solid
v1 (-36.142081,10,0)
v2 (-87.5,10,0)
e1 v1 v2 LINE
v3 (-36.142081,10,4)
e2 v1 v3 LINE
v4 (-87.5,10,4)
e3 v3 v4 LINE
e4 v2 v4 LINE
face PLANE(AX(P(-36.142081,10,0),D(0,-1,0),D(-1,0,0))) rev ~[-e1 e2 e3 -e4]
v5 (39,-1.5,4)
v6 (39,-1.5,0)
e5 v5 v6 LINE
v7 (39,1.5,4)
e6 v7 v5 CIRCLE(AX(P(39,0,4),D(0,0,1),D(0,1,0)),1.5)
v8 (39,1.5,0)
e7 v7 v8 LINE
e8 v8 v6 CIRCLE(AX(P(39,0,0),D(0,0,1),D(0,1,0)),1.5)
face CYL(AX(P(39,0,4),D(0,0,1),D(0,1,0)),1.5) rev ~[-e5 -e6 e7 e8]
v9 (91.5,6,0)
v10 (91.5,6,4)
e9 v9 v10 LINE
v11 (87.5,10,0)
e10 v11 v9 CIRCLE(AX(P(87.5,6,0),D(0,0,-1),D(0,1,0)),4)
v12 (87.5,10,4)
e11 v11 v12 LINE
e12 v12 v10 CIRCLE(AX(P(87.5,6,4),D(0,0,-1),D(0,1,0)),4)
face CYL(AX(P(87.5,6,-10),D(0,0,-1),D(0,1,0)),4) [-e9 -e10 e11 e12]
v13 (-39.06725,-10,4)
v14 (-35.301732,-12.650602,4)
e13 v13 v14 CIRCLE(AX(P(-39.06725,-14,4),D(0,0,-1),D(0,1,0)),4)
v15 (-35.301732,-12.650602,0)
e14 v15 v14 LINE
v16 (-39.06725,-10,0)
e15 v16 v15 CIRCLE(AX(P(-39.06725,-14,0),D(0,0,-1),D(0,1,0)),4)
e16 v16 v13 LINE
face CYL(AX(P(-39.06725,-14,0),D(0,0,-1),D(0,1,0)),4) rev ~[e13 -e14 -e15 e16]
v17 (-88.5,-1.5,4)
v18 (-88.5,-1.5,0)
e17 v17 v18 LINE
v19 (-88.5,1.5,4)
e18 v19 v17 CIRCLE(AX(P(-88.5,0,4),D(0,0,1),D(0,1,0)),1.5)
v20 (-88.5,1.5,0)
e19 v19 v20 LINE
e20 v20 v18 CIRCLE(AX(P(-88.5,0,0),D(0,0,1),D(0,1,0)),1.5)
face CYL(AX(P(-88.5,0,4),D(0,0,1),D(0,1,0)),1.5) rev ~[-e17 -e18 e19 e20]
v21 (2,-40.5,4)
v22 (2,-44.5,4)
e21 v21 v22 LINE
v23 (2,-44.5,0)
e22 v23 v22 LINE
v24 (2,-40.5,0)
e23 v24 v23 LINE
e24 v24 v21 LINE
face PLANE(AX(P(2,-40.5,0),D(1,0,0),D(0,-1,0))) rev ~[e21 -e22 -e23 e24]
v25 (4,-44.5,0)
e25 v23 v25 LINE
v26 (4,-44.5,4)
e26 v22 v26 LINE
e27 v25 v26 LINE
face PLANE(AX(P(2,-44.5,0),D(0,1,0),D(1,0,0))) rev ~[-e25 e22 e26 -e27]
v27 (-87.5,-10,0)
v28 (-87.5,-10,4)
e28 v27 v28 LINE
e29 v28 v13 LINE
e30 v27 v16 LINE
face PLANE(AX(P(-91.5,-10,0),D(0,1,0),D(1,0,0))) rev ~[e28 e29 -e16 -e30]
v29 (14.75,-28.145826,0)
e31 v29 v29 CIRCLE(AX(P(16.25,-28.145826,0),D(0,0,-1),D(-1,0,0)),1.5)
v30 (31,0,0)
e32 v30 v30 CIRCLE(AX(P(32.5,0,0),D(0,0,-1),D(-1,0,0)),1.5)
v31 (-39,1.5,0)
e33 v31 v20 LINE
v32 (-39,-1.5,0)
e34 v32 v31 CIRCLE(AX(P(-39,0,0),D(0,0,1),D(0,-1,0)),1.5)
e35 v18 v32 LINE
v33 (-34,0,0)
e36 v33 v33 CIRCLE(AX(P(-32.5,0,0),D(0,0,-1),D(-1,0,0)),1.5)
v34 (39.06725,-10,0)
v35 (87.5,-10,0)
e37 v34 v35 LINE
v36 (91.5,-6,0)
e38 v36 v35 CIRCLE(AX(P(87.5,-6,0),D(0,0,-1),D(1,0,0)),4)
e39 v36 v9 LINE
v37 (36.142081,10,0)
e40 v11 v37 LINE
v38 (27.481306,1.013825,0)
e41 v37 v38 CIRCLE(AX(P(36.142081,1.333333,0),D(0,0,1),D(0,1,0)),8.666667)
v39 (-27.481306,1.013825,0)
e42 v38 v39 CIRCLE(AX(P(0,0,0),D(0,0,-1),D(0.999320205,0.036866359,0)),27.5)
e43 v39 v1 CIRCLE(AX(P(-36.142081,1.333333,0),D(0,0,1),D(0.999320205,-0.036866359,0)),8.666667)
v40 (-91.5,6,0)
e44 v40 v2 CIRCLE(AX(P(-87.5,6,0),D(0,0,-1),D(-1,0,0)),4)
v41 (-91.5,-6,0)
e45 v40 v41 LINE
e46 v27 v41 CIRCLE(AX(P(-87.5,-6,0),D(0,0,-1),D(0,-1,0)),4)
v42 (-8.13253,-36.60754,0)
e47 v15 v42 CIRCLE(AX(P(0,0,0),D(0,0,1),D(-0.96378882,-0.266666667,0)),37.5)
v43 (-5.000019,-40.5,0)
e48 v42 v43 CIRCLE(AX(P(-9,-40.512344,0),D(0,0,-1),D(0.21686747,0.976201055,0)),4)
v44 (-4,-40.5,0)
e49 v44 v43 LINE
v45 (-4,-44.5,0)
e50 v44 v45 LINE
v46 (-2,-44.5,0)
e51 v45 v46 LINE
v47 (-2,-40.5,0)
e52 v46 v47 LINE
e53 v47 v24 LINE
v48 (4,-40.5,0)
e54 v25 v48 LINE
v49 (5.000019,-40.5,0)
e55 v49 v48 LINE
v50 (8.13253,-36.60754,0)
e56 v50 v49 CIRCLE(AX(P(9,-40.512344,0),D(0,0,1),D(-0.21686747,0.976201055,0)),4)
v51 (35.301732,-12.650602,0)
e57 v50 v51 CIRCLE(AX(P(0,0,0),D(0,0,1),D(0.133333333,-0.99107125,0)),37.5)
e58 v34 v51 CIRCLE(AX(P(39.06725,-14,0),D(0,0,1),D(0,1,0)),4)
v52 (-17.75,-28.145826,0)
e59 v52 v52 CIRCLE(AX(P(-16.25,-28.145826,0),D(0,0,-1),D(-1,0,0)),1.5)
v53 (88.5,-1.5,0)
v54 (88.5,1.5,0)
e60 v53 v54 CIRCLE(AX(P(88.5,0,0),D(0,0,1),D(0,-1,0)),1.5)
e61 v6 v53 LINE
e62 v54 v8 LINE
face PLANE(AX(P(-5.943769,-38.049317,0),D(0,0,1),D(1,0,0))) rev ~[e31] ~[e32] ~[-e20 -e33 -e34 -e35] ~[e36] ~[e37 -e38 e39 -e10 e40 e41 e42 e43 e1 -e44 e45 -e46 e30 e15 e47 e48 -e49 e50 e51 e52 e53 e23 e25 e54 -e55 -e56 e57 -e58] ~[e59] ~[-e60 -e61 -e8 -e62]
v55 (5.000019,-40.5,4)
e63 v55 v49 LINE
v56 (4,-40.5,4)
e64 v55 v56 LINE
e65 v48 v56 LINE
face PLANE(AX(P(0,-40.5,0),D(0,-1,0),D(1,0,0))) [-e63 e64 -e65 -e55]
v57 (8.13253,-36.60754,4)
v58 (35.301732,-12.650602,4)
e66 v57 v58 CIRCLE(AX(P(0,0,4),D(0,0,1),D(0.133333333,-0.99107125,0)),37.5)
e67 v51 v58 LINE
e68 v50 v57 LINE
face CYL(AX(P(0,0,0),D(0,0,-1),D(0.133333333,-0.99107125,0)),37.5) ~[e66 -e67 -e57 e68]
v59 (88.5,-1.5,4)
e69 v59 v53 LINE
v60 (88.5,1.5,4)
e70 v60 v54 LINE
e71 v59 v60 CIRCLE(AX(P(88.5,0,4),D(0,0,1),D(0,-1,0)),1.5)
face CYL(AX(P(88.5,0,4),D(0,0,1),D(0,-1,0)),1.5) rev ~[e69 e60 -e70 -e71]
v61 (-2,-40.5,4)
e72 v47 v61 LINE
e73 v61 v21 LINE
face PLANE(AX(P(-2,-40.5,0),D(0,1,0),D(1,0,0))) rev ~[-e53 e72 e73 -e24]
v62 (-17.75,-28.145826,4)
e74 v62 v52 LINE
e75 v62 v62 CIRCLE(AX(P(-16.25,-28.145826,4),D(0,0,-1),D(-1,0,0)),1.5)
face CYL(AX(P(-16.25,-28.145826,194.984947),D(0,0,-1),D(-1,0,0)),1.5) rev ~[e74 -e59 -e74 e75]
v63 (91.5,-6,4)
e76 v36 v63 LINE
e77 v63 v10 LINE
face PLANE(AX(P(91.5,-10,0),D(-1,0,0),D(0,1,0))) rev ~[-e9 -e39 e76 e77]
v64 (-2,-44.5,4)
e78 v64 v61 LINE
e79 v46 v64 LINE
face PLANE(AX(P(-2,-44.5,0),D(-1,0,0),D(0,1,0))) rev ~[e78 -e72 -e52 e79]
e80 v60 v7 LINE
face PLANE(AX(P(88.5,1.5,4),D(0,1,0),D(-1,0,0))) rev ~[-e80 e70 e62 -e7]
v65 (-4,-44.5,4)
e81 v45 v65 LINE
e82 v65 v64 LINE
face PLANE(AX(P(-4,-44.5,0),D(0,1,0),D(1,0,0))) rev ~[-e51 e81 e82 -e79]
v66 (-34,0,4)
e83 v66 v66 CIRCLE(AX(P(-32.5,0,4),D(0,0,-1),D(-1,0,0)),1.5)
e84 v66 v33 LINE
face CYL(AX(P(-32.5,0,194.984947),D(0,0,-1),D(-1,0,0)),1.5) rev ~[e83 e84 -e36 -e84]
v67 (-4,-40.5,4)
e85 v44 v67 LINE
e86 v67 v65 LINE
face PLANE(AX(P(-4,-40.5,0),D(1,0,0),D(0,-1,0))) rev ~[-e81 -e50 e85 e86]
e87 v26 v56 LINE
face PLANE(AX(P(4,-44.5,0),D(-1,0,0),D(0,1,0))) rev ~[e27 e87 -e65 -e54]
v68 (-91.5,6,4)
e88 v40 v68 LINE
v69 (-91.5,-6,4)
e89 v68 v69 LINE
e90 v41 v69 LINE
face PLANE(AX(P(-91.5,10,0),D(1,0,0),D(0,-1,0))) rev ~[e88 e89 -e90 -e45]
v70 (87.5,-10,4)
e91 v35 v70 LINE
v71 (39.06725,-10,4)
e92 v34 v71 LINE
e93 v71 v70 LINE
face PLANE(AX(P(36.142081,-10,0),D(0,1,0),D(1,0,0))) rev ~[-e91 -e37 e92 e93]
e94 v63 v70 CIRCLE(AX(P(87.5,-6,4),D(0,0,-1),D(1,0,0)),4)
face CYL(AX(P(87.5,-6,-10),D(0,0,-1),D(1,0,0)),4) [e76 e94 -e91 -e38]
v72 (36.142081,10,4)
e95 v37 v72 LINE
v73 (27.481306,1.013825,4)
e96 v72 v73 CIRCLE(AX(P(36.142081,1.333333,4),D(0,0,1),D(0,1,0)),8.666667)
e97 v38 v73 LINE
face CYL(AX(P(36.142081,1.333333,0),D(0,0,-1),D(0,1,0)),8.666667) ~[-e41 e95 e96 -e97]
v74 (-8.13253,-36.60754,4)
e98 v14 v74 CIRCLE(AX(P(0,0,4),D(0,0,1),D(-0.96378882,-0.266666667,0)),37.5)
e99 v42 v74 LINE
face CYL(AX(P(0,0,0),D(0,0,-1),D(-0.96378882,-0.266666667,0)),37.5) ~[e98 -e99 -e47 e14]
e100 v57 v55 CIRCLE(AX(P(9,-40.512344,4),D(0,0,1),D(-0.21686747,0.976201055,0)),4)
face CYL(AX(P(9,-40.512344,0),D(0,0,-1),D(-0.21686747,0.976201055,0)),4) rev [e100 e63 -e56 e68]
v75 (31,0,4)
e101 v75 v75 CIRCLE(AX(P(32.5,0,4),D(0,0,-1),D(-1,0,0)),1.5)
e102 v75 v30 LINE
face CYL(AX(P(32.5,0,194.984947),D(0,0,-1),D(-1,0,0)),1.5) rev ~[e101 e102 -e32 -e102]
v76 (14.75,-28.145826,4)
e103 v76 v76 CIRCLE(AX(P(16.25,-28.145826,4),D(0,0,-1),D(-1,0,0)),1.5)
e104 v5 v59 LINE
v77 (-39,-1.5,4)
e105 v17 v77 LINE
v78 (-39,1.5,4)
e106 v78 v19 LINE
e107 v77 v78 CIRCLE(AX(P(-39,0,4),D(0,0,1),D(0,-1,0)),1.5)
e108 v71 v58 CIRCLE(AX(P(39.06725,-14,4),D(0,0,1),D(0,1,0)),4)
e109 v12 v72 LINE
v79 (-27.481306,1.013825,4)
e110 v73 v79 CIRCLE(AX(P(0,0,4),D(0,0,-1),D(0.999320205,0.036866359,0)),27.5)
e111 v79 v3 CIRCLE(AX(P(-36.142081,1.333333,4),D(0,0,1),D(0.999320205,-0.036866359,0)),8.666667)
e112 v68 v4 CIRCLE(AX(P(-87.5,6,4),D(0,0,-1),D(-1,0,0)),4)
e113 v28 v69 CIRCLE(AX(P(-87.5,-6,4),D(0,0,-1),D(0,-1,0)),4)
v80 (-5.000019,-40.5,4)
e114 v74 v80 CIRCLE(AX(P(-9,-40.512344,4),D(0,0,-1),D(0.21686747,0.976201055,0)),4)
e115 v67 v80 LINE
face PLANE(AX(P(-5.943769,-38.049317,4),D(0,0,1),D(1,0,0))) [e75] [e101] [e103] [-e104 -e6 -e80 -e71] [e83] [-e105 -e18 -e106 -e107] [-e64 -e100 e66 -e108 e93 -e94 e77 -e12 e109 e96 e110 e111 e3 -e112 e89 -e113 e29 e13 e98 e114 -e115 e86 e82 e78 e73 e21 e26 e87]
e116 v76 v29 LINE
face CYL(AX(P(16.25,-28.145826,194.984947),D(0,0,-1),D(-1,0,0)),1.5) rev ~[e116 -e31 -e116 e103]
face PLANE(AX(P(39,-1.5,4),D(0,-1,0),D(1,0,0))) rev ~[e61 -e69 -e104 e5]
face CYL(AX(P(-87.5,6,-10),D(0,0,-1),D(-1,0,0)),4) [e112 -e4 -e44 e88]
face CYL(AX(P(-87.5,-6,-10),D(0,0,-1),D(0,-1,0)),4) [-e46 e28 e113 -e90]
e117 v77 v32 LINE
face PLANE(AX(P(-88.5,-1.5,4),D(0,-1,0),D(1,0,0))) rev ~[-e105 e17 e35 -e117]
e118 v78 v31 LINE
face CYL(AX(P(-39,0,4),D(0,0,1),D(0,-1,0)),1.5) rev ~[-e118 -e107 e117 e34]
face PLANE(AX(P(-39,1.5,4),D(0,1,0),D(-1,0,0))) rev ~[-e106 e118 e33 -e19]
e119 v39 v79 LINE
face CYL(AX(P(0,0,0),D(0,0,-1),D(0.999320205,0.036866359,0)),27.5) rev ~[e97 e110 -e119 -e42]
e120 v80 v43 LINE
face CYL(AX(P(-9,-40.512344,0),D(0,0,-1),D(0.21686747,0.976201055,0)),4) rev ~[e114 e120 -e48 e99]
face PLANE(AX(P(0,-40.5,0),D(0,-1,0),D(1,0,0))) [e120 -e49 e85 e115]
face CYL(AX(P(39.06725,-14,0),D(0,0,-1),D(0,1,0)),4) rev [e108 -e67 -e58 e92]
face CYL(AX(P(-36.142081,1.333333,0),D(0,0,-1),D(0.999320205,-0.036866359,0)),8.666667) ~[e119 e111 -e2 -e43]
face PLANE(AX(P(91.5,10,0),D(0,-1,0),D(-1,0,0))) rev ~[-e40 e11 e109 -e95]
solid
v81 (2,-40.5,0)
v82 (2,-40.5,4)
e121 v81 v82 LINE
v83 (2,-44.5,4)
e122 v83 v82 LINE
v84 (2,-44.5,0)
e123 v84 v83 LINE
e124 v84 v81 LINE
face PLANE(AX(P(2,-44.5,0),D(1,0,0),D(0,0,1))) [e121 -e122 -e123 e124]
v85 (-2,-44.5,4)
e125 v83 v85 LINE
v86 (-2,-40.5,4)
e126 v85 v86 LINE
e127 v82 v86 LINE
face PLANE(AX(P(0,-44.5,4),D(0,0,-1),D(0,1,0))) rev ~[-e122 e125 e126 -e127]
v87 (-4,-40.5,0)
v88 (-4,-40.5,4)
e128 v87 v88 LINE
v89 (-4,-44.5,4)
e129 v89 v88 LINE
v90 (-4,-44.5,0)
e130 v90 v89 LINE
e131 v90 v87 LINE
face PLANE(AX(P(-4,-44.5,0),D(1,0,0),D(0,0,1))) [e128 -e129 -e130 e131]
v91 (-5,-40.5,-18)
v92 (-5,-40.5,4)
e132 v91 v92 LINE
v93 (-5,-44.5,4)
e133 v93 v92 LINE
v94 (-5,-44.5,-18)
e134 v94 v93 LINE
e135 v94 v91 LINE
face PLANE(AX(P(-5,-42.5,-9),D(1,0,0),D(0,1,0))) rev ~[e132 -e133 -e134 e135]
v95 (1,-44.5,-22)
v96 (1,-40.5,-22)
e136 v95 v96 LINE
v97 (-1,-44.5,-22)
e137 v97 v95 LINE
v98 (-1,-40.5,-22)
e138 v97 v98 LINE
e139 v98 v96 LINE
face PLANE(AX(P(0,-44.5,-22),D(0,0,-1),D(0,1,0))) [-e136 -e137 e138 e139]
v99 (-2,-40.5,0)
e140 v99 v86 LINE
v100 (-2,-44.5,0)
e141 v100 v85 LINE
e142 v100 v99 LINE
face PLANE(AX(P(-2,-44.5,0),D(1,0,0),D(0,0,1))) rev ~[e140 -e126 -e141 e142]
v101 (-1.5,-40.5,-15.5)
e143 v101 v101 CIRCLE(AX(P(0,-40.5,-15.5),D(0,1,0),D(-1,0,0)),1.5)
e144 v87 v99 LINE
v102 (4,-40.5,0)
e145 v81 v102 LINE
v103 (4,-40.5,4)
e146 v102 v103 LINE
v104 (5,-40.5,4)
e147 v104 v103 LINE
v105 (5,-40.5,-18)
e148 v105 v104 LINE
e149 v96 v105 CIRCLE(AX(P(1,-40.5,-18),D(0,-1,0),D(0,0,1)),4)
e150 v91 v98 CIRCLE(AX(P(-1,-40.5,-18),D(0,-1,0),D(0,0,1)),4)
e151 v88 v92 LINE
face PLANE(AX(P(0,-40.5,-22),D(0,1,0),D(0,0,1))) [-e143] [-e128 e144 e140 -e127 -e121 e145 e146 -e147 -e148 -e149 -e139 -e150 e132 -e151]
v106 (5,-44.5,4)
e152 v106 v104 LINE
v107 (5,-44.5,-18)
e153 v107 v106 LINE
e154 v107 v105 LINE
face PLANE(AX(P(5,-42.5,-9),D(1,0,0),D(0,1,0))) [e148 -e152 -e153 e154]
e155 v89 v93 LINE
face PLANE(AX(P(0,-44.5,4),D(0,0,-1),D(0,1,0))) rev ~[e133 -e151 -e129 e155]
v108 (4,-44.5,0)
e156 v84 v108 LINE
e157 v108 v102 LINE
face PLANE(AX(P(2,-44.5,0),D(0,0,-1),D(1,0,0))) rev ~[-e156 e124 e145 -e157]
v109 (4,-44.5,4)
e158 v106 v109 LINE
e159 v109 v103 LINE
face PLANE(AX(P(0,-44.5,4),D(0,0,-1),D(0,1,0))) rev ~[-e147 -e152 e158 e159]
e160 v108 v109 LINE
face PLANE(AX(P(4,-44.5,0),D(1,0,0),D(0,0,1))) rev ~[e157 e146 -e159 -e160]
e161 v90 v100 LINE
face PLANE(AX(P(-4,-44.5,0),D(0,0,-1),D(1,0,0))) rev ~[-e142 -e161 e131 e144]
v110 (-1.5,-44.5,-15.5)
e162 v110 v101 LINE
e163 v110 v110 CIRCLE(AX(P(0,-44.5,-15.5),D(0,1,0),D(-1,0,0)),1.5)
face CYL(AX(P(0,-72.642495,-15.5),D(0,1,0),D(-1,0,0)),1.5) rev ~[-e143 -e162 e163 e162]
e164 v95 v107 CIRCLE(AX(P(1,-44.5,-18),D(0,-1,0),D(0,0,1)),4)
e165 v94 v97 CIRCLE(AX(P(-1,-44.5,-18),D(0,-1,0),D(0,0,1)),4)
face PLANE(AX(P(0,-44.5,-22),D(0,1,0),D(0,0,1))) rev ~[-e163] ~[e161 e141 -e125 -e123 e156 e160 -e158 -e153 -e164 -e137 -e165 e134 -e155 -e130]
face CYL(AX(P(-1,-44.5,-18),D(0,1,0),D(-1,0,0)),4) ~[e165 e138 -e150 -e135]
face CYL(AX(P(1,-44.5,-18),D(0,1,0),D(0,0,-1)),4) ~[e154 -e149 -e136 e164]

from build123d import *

# Parameters (mm, degrees)
F1_DEPTH      = 4
F3_D          = 3
F5_DEPTH      = 4
F6_W          = 4
F6_H          = 26
F7_DEPTH      = 5
F7_DEPTH_BACK = 5
F8_T1_DEPTH   = 4
F8_T6_DEPTH   = 4
F8_T11_DEPTH  = 4
F8_T13_DEPTH  = 24
F8_2_F1_R     = 4
F8_2_F2_R     = 4
F10_D         = 3
F11_W         = 2
F11_H         = 4
F12_DEPTH     = 4


# Not quite as in the source:
# - a fillet or chamfer that OpenCascade refuses, or shapes differently, is made with other operations: its cross-section is extruded or revolved along the edge and cut away or added
# - a feature names something its author has since deleted; it is built from what else it names


with BuildPart() as f1:
    # F0 (on Top) → F1 (new body)
    with BuildSketch(Plane.XY):
        with BuildLine():
            ThreePointArc((27.4813056295, 1.0138248848), (0, -27.5), (-27.4813056295, 1.0138248848))
            ThreePointArc((-27.4813056295, 1.0138248848), (-29.9018810474, 7.3475680266), (-36.142080737, 10))
            Line((-36.142080737, 10), (-91.5, 10))
            Line((-91.5, 10), (-91.5, -10))
            Line((-91.5, -10), (-36.142080737, -10))
            ThreePointArc((-36.142080737, -10), (-24.6506458841, -28.2594348404), (-5, -37.1651718683))
            Line((-5, -37.1651718683), (-5, -40.5))
            Line((-5, -40.5), (-4, -40.5))
            Line((-4, -40.5), (-4, -44.5))
            Line((-4, -44.5), (-2, -44.5))
            Line((-2, -44.5), (-2, -40.5))
            Line((-2, -40.5), (2, -40.5))
            Line((2, -40.5), (2, -44.5))
            Line((2, -44.5), (4, -44.5))
            Line((4, -44.5), (4, -40.5))
            Line((4, -40.5), (5, -40.5))
            Line((5, -40.5), (5, -37.1651718683))
            ThreePointArc((5, -37.1651718683), (24.6506458841, -28.2594348404), (36.142080737, -10))
            Line((36.142080737, -10), (91.5, -10))
            Line((91.5, -10), (91.5, 10))
            Line((91.5, 10), (36.142080737, 10))
            ThreePointArc((36.142080737, 10), (29.9018810474, 7.3475680266), (27.4813056295, 1.0138248848))
        make_face()
    extrude(amount=F1_DEPTH)

    # F3 (through all)
    with Locations(Plane.XY.offset(4)):
        with Locations((-32.5, 0), (-16.25, -28.145825623), (16.25, -28.145825623), (32.5, 0)):
            Hole(F3_D / 2)

    # F4 (on face) → F5 (cut, through all)
    with BuildSketch(Plane.XY.offset(4)):
        with BuildLine():
            Line((-39, 1.5), (-88.5, 1.5))
            ThreePointArc((-88.5, 1.5), (-90, 0), (-88.5, -1.5))
            Line((-88.5, -1.5), (-39, -1.5))
            ThreePointArc((-39, -1.5), (-37.5, 0), (-39, 1.5))
        make_face()
        with BuildLine():
            Line((39, -1.5), (88.5, -1.5))
            ThreePointArc((88.5, -1.5), (90, 0), (88.5, 1.5))
            Line((88.5, 1.5), (39, 1.5))
            ThreePointArc((39, 1.5), (37.5, 0), (39, -1.5))
        make_face()
    extrude(amount=-F5_DEPTH, mode=Mode.SUBTRACT)

    # F8: fillet of radius 4 on 10 edges, made by hand

    # F8_s2 → F8_t1 (join)
    with BuildSketch(Plane.XY):
        with BuildLine():
            ThreePointArc((-39.0672497112, -10), (-36.7648151694, -10.7290987204), (-35.3017316668, -12.6506024096))
            ThreePointArc((-35.3017316668, -12.6506024096), (-35.7464824281, -11.3330928709), (-36.142080737, -10))
            Line((-36.142080737, -10), (-39.0672497112, -10))
        make_face()
        with BuildLine():
            ThreePointArc((39.0672497112, -10), (36.7648151694, -10.7290987204), (35.3017316668, -12.6506024096))
            ThreePointArc((35.3017316668, -12.6506024096), (35.7464824281, -11.3330928709), (36.142080737, -10))
            Line((36.142080737, -10), (39.0672497112, -10))
        make_face()
    extrude(amount=F8_T1_DEPTH)


with BuildPart() as f7:
    # F6 (on Right) → F7 (new body, two sides)
    with BuildSketch(Plane.YZ) as f7_sk:
        with Locations((-42.5, -9)):
            Rectangle(F6_W, F6_H)
    extrude(amount=F7_DEPTH)
    extrude(f7_sk.sketch, amount=-F7_DEPTH_BACK)

    # F8#2: fillet of radius 4 on 2 edges, made by hand

    # F8_2_f1
    f8_2_f1_edges = [f7.edges().sort_by_distance(p)[0] for p in [
        (-5, -42.5, -22),
    ]]
    fillet(f8_2_f1_edges, radius=F8_2_F1_R)

    # F8_2_f2
    f8_2_f2_edges = [f7.edges().sort_by_distance(p)[0] for p in [
        (5, -42.5, -22),
    ]]
    fillet(f8_2_f2_edges, radius=F8_2_F2_R)

    # F10 (through all)
    with Locations(Plane.XZ.offset(44.5)):
        with Locations((0, -15.5)):
            Hole(F10_D / 2)

    # F11 (on face) → F12 (cut, through all)
    with BuildSketch(Plane.XZ.offset(44.5)):
        with Locations((3, 2)):
            Rectangle(F11_W, F11_H)
        with Locations((-3, 2)):
            Rectangle(F11_W, F11_H)
    extrude(amount=-F12_DEPTH, mode=Mode.SUBTRACT)


with BuildPart() as f8_tool4:
    # F8_s5 → F8_t6 (new body)
    with BuildSketch(Plane.XY):
        with BuildLine():
            ThreePointArc((8.1325301205, -36.6075395764), (5.8799135014, -38.009333562), (5, -40.5123437979))
            Line((5, -40.5123437979), (5, -37.1651718683))
            ThreePointArc((5, -37.1651718683), (6.5721819272, -36.9195940486), (8.1325301205, -36.6075395764))
        make_face()
    extrude(amount=F8_T6_DEPTH)

    split(bisect_by=Plane.XZ.offset(40.5), keep=Keep.BOTTOM)


with BuildPart() as f1_1:
    add(f1.part)

    # F8_t3: union F8_tool4
    add(f8_tool4.part)


with BuildPart() as f8_tool9:
    # F8_s10 → F8_t11 (new body)
    with BuildSketch(Plane.XY):
        with BuildLine():
            ThreePointArc((-8.1325301205, -36.6075395764), (-5.8799135014, -38.009333562), (-5, -40.5123437979))
            Line((-5, -40.5123437979), (-5, -37.1651718683))
            ThreePointArc((-5, -37.1651718683), (-6.5721819272, -36.9195940486), (-8.1325301205, -36.6075395764))
        make_face()
    extrude(amount=F8_T11_DEPTH)

    split(bisect_by=Plane.XZ.offset(40.5), keep=Keep.BOTTOM)


with BuildPart() as f1_2:
    add(f1_1.part)

    # F8_t8: union F8_tool9
    add(f8_tool9.part)

    # F8_s14 → F8_t13 (cut)
    with BuildSketch(Plane.XY.offset(-10)):
        with BuildLine():
            ThreePointArc((91.5, -6), (90.3284271247, -8.8284271247), (87.5, -10))
            Line((87.5, -10), (91.5, -10))
            Line((91.5, -10), (91.5, -6))
        make_face()
        with BuildLine():
            ThreePointArc((-91.5, 6), (-90.3284271247, 8.8284271247), (-87.5, 10))
            Line((-87.5, 10), (-91.5, 10))
            Line((-91.5, 10), (-91.5, 6))
        make_face()
        with BuildLine():
            ThreePointArc((-87.5, -10), (-90.3284271247, -8.8284271247), (-91.5, -6))
            Line((-91.5, -6), (-91.5, -10))
            Line((-91.5, -10), (-87.5, -10))
        make_face()
        with BuildLine():
            ThreePointArc((87.5, 10), (90.3284271247, 8.8284271247), (91.5, 6))
            Line((91.5, 6), (91.5, 10))
            Line((91.5, 10), (87.5, 10))
        make_face()
    extrude(amount=F8_T13_DEPTH, mode=Mode.SUBTRACT)


solid = Compound([f7.part, f1_2.part])
